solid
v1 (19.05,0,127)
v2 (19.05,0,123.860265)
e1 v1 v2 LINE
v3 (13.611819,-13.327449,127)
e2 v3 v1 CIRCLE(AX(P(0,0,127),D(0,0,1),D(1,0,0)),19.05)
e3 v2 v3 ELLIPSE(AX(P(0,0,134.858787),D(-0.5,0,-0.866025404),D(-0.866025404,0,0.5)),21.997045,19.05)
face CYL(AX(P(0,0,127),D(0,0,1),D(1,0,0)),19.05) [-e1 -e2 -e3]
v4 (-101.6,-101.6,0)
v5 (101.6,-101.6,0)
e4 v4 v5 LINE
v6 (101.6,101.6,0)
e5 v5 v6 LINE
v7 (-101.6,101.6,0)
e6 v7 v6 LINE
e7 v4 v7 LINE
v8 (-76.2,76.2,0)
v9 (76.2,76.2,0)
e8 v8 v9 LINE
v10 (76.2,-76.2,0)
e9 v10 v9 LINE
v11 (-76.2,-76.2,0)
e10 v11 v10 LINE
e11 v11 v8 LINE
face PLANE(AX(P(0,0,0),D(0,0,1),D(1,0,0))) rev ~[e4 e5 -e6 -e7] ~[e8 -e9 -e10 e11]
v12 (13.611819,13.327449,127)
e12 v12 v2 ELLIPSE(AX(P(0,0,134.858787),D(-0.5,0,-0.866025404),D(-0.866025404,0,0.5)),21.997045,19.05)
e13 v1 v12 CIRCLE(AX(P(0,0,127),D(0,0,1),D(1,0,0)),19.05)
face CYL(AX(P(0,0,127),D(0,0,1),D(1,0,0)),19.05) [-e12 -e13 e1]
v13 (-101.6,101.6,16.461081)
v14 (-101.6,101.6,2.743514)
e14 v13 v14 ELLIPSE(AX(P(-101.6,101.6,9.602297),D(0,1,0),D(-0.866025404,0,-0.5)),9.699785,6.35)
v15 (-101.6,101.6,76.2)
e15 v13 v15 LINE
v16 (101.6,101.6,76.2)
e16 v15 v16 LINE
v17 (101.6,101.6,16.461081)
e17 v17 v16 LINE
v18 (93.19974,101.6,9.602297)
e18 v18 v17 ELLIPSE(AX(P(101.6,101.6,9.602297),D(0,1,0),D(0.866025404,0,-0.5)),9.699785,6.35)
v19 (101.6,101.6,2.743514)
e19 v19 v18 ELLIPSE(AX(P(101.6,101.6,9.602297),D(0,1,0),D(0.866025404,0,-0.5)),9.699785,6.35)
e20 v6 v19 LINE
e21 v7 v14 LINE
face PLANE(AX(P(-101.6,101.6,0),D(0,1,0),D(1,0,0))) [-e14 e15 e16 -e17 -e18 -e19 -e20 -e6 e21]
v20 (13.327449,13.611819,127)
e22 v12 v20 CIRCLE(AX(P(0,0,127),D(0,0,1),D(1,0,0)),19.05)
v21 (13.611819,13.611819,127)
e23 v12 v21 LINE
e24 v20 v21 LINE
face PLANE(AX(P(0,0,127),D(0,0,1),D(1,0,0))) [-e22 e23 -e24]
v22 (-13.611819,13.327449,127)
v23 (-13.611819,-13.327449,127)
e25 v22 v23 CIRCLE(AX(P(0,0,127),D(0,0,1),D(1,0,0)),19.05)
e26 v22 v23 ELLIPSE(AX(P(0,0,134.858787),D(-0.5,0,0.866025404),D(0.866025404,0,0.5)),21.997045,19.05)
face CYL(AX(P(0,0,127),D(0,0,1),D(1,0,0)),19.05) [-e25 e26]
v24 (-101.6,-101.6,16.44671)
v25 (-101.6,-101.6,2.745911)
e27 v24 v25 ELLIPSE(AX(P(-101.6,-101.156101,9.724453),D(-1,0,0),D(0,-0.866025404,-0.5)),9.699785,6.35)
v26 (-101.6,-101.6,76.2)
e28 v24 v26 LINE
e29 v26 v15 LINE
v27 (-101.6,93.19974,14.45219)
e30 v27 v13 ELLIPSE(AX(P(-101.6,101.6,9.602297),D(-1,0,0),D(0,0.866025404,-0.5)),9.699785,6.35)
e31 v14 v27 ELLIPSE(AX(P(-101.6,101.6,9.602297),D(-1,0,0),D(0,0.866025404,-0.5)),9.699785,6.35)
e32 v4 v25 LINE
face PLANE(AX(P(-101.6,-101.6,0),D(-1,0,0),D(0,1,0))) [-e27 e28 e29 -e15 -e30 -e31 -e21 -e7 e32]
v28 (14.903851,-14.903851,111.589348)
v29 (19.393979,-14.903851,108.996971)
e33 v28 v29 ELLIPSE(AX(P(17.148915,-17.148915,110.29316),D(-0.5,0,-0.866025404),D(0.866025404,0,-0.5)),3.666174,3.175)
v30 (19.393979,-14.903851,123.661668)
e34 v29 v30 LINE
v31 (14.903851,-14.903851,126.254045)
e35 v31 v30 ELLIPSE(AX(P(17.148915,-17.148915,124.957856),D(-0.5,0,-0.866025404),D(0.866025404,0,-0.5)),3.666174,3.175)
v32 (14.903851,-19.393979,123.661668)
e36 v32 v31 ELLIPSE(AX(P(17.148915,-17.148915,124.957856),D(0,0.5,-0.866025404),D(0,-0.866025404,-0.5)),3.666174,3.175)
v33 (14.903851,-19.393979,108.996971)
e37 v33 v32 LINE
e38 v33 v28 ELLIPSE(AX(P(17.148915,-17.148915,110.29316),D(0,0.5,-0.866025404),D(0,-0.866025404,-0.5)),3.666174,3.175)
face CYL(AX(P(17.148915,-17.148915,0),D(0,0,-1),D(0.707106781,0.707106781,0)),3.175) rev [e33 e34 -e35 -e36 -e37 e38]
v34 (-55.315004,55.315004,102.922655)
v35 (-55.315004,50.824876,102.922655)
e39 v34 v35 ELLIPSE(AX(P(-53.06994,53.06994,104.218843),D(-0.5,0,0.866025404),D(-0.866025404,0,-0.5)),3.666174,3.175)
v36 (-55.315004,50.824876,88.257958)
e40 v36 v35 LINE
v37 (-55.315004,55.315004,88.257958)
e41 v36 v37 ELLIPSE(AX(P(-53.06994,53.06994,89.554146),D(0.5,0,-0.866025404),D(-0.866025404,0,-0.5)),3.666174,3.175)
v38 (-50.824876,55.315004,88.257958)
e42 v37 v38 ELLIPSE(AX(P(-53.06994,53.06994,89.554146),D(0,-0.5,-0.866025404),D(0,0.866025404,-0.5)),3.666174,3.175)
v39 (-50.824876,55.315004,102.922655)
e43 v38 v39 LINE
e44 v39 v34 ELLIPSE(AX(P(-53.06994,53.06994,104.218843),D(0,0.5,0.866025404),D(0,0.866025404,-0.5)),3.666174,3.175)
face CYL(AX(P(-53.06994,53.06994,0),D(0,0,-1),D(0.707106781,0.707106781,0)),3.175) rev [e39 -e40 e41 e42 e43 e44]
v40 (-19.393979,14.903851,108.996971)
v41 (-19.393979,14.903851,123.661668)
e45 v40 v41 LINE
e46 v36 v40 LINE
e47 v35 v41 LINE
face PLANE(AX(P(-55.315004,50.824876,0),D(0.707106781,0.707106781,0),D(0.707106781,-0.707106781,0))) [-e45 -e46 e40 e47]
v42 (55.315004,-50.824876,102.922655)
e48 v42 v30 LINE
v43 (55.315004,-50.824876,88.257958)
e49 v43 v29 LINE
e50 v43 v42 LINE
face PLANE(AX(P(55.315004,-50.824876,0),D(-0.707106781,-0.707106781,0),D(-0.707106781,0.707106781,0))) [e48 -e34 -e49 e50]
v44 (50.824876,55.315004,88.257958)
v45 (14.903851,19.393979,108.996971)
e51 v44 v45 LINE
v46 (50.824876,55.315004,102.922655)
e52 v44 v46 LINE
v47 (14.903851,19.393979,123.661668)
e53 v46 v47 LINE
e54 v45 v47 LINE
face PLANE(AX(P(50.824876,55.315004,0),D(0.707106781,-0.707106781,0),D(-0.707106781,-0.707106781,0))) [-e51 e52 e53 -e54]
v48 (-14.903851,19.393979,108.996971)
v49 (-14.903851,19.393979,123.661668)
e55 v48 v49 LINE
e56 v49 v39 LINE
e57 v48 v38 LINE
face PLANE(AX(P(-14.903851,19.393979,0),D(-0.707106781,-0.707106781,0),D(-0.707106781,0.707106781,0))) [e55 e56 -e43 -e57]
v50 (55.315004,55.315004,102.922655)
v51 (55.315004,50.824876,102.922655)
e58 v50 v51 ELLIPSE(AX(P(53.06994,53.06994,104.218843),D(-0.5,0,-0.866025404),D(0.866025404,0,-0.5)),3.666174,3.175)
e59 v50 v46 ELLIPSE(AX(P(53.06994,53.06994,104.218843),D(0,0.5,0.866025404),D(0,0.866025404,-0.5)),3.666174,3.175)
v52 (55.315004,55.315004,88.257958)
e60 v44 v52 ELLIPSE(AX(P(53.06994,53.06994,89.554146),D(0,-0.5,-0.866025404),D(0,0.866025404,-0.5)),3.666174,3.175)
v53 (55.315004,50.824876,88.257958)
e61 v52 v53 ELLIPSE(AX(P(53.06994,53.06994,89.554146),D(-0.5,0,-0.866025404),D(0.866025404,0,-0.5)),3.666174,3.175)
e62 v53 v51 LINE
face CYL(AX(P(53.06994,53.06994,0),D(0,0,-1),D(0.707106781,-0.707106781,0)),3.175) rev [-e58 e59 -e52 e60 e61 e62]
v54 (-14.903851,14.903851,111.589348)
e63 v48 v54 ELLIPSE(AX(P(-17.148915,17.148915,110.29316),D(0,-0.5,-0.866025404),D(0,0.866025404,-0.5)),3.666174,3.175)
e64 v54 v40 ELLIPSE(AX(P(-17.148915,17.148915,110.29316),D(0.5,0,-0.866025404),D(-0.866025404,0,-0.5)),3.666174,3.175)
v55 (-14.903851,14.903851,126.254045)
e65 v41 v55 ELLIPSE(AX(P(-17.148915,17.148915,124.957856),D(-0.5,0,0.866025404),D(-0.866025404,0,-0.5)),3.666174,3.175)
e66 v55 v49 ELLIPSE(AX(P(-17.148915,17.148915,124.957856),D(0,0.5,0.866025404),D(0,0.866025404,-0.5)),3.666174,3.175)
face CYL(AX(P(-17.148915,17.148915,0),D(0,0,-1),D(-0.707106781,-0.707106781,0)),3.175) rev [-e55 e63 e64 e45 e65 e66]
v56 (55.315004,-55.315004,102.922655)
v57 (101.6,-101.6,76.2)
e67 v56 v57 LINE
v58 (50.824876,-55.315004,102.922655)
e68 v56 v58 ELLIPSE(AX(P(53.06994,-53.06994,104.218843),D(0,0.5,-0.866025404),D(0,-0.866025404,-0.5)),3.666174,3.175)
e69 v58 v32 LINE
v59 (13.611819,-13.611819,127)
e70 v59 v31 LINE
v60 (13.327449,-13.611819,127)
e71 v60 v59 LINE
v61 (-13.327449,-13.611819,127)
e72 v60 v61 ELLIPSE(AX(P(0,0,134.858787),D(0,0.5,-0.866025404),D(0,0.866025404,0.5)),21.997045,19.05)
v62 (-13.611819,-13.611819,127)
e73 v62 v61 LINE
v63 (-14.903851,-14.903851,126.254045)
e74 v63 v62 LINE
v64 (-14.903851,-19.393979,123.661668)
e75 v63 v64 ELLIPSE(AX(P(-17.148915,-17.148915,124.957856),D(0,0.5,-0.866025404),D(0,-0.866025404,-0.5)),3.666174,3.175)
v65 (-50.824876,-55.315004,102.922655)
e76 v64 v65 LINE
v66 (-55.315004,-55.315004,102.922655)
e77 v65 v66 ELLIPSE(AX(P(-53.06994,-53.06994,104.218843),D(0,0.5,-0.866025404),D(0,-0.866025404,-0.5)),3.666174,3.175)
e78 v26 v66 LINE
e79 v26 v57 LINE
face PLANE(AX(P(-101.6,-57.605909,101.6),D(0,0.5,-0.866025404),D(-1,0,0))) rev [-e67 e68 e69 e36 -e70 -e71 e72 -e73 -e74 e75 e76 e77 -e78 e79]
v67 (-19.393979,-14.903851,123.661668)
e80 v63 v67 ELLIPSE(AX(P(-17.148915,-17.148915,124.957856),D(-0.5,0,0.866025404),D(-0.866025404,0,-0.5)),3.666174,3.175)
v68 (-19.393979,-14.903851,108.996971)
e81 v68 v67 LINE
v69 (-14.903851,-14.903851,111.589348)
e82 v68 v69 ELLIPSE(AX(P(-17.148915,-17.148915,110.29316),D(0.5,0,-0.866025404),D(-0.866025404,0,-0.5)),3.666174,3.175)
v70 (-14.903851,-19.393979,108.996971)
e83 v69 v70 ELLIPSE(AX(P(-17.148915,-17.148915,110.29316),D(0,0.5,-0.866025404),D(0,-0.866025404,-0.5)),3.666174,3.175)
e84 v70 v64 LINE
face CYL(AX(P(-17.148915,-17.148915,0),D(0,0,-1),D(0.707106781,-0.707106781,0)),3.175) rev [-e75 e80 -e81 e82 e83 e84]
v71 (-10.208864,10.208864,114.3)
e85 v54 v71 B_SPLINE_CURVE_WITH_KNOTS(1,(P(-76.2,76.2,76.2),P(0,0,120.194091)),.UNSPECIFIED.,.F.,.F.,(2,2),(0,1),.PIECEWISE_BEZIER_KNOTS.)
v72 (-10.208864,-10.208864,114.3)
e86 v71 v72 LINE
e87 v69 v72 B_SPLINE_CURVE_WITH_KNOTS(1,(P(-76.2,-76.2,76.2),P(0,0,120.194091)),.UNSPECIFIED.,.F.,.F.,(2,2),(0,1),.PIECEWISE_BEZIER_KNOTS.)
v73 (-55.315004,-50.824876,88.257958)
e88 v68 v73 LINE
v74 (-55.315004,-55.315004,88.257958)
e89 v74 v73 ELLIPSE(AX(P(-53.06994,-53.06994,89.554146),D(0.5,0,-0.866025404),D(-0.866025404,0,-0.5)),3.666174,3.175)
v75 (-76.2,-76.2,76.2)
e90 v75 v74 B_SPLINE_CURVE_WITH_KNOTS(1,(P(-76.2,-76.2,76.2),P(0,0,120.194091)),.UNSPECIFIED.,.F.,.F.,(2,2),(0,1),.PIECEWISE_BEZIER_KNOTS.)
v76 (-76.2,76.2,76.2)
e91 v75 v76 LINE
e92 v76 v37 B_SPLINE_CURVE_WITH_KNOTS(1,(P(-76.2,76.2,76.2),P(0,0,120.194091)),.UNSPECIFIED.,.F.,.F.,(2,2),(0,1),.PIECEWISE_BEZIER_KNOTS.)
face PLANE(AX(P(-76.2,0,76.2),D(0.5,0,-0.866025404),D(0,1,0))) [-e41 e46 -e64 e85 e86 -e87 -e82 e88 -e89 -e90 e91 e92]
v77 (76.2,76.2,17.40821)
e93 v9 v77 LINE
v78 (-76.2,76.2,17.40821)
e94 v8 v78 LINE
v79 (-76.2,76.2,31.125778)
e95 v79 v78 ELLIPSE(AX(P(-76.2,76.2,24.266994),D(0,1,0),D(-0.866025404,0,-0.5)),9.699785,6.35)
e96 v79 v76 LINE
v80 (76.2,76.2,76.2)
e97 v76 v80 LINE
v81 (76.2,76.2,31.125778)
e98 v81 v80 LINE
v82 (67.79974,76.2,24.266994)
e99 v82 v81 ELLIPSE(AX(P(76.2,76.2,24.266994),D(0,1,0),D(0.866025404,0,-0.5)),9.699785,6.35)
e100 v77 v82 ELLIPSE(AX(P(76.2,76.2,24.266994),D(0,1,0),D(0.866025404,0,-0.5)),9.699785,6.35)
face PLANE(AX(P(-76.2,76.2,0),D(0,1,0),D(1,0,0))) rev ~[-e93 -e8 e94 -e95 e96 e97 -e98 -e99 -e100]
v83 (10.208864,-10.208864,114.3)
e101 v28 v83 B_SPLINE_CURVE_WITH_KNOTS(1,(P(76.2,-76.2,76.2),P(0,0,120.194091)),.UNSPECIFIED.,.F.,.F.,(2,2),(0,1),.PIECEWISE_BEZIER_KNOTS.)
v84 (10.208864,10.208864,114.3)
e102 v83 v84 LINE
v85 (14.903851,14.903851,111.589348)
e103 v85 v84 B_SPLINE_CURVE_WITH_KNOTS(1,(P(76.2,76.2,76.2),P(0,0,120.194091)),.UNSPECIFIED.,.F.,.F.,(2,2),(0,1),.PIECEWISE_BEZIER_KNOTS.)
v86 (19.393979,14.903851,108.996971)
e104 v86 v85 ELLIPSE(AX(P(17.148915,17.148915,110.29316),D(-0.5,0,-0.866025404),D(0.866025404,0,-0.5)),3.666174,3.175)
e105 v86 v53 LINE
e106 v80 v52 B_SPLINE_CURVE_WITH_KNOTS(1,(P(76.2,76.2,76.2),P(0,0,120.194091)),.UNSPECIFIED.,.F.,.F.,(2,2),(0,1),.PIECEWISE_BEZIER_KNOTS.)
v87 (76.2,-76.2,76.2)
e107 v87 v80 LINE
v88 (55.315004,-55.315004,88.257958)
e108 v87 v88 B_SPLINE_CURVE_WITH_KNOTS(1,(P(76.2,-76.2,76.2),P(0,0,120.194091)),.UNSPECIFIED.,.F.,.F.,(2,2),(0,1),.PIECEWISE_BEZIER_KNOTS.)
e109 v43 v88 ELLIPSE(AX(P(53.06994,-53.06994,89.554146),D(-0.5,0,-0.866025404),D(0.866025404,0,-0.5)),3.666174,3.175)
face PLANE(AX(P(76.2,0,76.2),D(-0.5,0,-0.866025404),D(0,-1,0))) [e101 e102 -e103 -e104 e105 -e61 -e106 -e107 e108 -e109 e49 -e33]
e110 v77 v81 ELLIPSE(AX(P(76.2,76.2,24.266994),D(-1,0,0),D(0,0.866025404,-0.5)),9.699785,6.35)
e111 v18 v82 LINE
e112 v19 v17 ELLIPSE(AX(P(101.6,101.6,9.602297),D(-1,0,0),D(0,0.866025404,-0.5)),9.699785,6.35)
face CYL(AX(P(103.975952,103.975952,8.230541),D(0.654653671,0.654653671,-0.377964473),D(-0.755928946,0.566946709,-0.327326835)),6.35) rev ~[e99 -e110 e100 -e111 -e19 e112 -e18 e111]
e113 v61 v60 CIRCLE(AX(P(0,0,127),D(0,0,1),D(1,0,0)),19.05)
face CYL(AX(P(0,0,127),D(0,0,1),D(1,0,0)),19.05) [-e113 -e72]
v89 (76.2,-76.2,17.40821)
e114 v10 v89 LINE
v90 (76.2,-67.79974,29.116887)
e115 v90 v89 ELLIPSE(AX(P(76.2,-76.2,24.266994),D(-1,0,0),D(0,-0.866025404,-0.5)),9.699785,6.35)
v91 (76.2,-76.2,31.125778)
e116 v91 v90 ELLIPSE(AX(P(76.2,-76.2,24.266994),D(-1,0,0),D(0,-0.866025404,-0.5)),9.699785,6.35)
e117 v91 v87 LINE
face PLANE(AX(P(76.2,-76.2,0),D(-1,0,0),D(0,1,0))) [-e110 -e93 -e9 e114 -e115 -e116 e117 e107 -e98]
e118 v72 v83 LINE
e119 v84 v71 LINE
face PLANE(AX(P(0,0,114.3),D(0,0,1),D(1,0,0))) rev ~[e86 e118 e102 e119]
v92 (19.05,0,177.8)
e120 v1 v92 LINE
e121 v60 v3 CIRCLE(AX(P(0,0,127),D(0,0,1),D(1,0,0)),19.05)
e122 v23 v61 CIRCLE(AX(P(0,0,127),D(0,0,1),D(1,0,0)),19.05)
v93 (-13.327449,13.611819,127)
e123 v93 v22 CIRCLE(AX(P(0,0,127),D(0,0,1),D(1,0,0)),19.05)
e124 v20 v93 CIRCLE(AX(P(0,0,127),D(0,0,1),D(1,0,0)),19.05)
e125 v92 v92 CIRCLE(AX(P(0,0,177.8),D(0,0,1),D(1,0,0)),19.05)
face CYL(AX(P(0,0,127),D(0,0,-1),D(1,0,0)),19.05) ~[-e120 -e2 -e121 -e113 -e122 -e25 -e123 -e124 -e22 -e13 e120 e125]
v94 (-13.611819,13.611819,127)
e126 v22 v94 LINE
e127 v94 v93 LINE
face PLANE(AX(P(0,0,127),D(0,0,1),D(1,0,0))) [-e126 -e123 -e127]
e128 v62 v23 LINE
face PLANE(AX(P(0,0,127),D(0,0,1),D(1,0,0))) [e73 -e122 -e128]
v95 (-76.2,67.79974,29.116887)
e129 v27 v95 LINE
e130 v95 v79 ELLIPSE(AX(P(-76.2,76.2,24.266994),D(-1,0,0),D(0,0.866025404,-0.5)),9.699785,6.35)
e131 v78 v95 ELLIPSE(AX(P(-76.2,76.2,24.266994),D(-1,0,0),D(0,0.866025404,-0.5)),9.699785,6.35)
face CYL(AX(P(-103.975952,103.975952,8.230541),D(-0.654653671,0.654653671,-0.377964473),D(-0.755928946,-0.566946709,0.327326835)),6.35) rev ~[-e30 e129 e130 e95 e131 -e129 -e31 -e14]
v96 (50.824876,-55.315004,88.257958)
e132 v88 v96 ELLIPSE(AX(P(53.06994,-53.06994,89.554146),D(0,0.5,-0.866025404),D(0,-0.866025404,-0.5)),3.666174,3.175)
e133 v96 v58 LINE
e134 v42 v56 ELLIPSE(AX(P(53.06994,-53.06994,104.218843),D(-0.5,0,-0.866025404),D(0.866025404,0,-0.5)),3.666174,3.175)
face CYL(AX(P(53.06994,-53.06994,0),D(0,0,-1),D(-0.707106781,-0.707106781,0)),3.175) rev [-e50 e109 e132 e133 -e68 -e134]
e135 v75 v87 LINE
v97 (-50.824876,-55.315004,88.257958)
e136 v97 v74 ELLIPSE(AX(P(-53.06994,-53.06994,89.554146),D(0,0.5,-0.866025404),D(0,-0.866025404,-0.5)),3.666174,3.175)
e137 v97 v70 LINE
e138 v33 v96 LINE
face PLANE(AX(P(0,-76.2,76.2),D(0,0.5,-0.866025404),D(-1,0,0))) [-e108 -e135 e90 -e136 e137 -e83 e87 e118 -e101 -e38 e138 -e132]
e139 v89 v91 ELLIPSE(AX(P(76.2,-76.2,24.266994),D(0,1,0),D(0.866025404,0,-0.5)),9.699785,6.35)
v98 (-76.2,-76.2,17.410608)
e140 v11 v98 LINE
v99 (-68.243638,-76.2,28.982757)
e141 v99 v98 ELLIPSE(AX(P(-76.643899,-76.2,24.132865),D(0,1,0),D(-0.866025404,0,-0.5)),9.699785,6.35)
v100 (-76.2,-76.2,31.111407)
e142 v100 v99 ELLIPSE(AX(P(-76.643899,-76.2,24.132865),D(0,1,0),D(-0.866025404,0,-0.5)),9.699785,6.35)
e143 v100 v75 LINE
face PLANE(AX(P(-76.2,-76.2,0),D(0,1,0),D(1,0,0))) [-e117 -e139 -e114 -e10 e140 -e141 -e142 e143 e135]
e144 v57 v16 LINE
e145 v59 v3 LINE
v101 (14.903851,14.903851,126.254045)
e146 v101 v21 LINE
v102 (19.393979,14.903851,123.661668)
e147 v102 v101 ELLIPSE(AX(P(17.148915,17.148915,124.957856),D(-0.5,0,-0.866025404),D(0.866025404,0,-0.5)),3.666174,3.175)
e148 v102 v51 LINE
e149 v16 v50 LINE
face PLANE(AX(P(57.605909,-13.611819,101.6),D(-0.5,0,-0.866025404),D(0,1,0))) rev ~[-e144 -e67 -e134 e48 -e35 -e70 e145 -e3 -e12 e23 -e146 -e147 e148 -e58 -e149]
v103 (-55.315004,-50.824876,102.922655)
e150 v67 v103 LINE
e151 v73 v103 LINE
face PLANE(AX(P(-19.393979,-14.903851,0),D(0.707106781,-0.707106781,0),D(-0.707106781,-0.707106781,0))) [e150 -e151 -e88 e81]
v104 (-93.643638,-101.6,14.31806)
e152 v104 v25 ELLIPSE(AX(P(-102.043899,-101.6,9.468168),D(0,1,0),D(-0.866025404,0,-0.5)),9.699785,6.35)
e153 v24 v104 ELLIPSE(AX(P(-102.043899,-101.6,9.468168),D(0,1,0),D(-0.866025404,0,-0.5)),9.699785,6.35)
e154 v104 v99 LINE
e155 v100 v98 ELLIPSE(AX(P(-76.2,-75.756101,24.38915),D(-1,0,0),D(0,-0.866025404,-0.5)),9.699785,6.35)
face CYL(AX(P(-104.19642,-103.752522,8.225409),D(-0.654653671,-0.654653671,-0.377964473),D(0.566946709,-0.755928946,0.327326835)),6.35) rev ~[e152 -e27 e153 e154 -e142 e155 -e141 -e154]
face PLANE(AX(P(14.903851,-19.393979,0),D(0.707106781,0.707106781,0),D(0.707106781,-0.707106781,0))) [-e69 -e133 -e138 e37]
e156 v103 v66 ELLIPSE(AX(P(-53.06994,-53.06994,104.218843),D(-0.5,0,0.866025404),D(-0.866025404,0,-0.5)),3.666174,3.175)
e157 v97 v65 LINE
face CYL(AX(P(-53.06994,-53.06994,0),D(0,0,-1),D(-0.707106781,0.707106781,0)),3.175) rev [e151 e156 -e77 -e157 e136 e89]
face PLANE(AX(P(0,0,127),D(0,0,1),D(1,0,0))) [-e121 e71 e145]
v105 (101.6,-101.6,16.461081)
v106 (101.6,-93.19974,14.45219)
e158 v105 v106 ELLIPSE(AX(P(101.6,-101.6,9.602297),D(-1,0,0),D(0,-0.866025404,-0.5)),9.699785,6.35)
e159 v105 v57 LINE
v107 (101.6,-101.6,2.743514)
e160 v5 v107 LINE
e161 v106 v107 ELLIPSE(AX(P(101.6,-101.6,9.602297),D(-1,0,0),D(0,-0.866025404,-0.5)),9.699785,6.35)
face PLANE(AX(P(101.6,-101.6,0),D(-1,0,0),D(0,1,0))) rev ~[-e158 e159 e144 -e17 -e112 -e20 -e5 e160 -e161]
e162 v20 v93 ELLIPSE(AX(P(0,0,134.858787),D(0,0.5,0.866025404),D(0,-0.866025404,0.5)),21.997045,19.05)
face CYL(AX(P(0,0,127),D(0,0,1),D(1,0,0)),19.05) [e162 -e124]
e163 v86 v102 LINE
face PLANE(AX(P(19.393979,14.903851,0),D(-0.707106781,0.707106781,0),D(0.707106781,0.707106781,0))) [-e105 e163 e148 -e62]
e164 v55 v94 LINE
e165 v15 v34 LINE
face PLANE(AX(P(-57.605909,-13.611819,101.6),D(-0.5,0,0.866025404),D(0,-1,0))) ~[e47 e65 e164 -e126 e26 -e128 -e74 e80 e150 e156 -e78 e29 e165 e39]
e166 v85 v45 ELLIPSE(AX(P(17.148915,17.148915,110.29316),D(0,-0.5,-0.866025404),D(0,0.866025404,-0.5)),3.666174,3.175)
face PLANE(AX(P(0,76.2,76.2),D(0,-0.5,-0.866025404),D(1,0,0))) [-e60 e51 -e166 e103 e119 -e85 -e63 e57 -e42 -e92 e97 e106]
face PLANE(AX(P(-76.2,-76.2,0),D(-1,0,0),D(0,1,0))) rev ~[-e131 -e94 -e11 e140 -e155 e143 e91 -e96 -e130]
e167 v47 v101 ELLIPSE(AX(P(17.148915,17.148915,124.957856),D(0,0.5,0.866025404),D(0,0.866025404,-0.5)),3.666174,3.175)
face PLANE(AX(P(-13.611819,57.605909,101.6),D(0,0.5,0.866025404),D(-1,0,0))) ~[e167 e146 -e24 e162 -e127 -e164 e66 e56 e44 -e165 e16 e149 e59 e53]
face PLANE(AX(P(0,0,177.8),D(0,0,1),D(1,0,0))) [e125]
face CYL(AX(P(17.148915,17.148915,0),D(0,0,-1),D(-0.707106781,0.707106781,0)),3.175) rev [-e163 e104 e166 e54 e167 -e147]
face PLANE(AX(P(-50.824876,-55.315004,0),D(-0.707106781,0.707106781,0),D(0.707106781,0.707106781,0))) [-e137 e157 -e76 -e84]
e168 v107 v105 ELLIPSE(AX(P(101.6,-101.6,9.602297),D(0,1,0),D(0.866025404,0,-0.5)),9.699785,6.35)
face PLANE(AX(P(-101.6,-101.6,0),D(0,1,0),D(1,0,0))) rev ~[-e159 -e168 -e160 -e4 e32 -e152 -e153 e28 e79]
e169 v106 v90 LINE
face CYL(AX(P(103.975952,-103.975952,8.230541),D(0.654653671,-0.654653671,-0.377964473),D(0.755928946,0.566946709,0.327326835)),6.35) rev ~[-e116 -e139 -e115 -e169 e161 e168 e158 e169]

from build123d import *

# Parameters (mm, degrees)
F0_W           = 203.2
F0_H           = 203.2
F1_DEPTH       = 127
F2_W           = 152.4
F2_H           = 152.4
F3_DEPTH       = 76.2
F4_W           = 152.4
F4_H           = 152.4
F6_C1_SIZE2    = 87.9881810245
F6_C1_SIZE     = 50.8
F6_C2_SIZE2    = 87.9881810245
F6_C2_SIZE     = 50.8
F6_C3_SIZE2    = 50.8
F6_C3_SIZE     = 87.9881810245
F6_C4_SIZE2    = 87.9881810245
F6_C4_SIZE     = 50.8
F8_DEPTH       = 127
F10_R          = 6.35
F11_DEPTH      = 76.2
F15_R          = 6.35
F16_DEPTH      = 127
F17_R          = 6.35
F18_DEPTH      = 127
F19_R          = 6.35
F20_DEPTH      = 127
F21_R          = 19.05
F22_DEPTH      = 50.8
F22_DEPTH_BACK = 12.7


# Not quite as in the source:
# - an extrude whose draft closes it to a point is written as a loft to that point


with BuildPart() as f1:
    # F0 (on Top) → F1 (new body)
    with BuildSketch(Plane.XY):
        Rectangle(F0_W, F0_H)
    extrude(amount=F1_DEPTH)

    # F2 (on face) → F3 (cut)
    with BuildSketch(Plane.XY):
        Rectangle(F2_W, F2_H)
    extrude(amount=F3_DEPTH, mode=Mode.SUBTRACT)

    # F4 (on face) → F5 section 0
    with BuildSketch(Plane(origin=(0, 0, 76.2), x_dir=(1, 0, 0), z_dir=(0, 0, -1)), mode=Mode.PRIVATE) as f5_s0:
        Rectangle(F4_W, F4_H)
    loft([f5_s0.sketch, Vertex(0, 0, 120.1940905122)], ruled=True, mode=Mode.SUBTRACT)

    # F6: chamfer of 50.8 x 87.9881810245 on 4 edges, made by hand

    # F6_c1
    f6_c1_edges = [f1.edges().sort_by_distance(p)[0] for p in [
        (0, -101.6, 127),
    ]]
    f6_c1_side = f1.faces().sort_by_distance((0, -101.6, 125.984))[0]
    chamfer(f6_c1_edges, length=F6_C1_SIZE, length2=F6_C1_SIZE2, reference=f6_c1_side)

    # F6_c2
    f6_c2_edges = [f1.edges().sort_by_distance(p)[0] for p in [
        (-101.6, 43.9940905122, 127),
    ]]
    f6_c2_side = f1.faces().sort_by_distance((-101.6, 43.9940905122, 125.984))[0]
    chamfer(f6_c2_edges, length=F6_C2_SIZE, length2=F6_C2_SIZE2, reference=f6_c2_side)

    # F6_c3
    f6_c3_edges = [f1.edges().sort_by_distance(p)[0] for p in [
        (101.6, 43.9940905122, 127),
    ]]
    f6_c3_side = f1.faces().sort_by_distance((100.584, 43.9940905122, 127))[0]
    chamfer(f6_c3_edges, length=F6_C3_SIZE, length2=F6_C3_SIZE2, reference=f6_c3_side)

    # F6_c4
    f6_c4_edges = [f1.edges().sort_by_distance(p)[0] for p in [
        (0, 101.6, 127),
    ]]
    f6_c4_side = f1.faces().sort_by_distance((0, 101.6, 125.984))[0]
    chamfer(f6_c4_edges, length=F6_C4_SIZE, length2=F6_C4_SIZE2, reference=f6_c4_side)

    # F7 (on Top) → F8 (cut, through all)
    with BuildSketch(Plane.XY):
        with BuildLine():
            Line((-19.3939794208, -14.9038513603), (-55.3150039051, -50.8248758446))
            ThreePointArc((-55.3150039051, -50.8248758446), (-55.3150039051, -55.3150039051), (-50.8248758446, -55.3150039051))
            Line((-50.8248758446, -55.3150039051), (-14.9038513603, -19.3939794208))
            ThreePointArc((-14.9038513603, -19.3939794208), (-14.9038513603, -14.9038513603), (-19.3939794208, -14.9038513603))
        make_face()
        with BuildLine():
            Line((-55.3150039051, 50.8248758446), (-19.3939794208, 14.9038513603))
            ThreePointArc((-19.3939794208, 14.9038513603), (-14.9038513603, 14.9038513603), (-14.9038513603, 19.3939794208))
            Line((-14.9038513603, 19.3939794208), (-50.8248758446, 55.3150039051))
            ThreePointArc((-50.8248758446, 55.3150039051), (-55.3150039051, 55.3150039051), (-55.3150039051, 50.8248758446))
        make_face()
        with BuildLine():
            Line((50.8248758446, 55.3150039051), (14.9038513603, 19.3939794208))
            ThreePointArc((14.9038513603, 19.3939794208), (14.9038513603, 14.9038513603), (19.3939794208, 14.9038513603))
            Line((19.3939794208, 14.9038513603), (55.3150039051, 50.8248758446))
            ThreePointArc((55.3150039051, 50.8248758446), (55.3150039051, 55.3150039051), (50.8248758446, 55.3150039051))
        make_face()
        with BuildLine():
            Line((55.3150039051, -50.8248758446), (19.3939794208, -14.9038513603))
            ThreePointArc((19.3939794208, -14.9038513603), (14.9038513603, -14.9038513603), (14.9038513603, -19.3939794208))
            Line((14.9038513603, -19.3939794208), (50.8248758446, -55.3150039051))
            ThreePointArc((50.8248758446, -55.3150039051), (55.3150039051, -55.3150039051), (55.3150039051, -50.8248758446))
        make_face()
    extrude(amount=F8_DEPTH, mode=Mode.SUBTRACT)

    # F10 (on face) → F11 (cut)
    with BuildSketch(Plane(origin=(87.0857142857, -87.0857142857, -50.2789605854), x_dir=(0.755928946, 0.5669467095, 0.3273268354), z_dir=(0.6546536707, -0.6546536707, -0.377964473))):
        with Locations((22.3436848712, 59.1158335421)):
            Circle(F10_R)
    extrude(amount=-F11_DEPTH, mode=Mode.SUBTRACT)

    # F15 (on face) → F16 (cut)
    with BuildSketch(Plane(origin=(-87.0857142857, -87.0857142857, -50.2789605854), x_dir=(0.5669467095, -0.755928946, 0.3273268354), z_dir=(-0.6546536707, -0.6546536707, -0.377964473))):
        with Locations((22.0481136328, 59.221623296)):
            Circle(F15_R)
    extrude(amount=-F16_DEPTH, mode=Mode.SUBTRACT)

    # F17 (on face) → F18 (cut)
    with BuildSketch(Plane(origin=(-87.0857142857, 87.0857142857, -50.2789605854), x_dir=(-0.755928946, -0.5669467095, 0.3273268354), z_dir=(-0.6546536707, 0.6546536707, -0.377964473))):
        with Locations((22.3436848712, 59.1158335421)):
            Circle(F17_R)
    extrude(amount=-F18_DEPTH, mode=Mode.SUBTRACT)

    # F19 (on face) → F20 (cut)
    with BuildSketch(Plane(origin=(87.0857142857, 87.0857142857, -50.2789605854), x_dir=(-0.755928946, 0.5669467095, -0.3273268354), z_dir=(0.6546536707, 0.6546536707, -0.377964473))):
        with Locations((-22.3436848712, 59.1158335421)):
            Circle(F19_R)
    extrude(amount=-F20_DEPTH, mode=Mode.SUBTRACT)

    # F21 (on face) → F22 (join, two sides)
    with BuildSketch(Plane.XY.offset(127)) as f22_sk:
        Circle(F21_R)
    extrude(amount=F22_DEPTH)
    extrude(f22_sk.sketch, amount=-F22_DEPTH_BACK)


solid = f1.part
